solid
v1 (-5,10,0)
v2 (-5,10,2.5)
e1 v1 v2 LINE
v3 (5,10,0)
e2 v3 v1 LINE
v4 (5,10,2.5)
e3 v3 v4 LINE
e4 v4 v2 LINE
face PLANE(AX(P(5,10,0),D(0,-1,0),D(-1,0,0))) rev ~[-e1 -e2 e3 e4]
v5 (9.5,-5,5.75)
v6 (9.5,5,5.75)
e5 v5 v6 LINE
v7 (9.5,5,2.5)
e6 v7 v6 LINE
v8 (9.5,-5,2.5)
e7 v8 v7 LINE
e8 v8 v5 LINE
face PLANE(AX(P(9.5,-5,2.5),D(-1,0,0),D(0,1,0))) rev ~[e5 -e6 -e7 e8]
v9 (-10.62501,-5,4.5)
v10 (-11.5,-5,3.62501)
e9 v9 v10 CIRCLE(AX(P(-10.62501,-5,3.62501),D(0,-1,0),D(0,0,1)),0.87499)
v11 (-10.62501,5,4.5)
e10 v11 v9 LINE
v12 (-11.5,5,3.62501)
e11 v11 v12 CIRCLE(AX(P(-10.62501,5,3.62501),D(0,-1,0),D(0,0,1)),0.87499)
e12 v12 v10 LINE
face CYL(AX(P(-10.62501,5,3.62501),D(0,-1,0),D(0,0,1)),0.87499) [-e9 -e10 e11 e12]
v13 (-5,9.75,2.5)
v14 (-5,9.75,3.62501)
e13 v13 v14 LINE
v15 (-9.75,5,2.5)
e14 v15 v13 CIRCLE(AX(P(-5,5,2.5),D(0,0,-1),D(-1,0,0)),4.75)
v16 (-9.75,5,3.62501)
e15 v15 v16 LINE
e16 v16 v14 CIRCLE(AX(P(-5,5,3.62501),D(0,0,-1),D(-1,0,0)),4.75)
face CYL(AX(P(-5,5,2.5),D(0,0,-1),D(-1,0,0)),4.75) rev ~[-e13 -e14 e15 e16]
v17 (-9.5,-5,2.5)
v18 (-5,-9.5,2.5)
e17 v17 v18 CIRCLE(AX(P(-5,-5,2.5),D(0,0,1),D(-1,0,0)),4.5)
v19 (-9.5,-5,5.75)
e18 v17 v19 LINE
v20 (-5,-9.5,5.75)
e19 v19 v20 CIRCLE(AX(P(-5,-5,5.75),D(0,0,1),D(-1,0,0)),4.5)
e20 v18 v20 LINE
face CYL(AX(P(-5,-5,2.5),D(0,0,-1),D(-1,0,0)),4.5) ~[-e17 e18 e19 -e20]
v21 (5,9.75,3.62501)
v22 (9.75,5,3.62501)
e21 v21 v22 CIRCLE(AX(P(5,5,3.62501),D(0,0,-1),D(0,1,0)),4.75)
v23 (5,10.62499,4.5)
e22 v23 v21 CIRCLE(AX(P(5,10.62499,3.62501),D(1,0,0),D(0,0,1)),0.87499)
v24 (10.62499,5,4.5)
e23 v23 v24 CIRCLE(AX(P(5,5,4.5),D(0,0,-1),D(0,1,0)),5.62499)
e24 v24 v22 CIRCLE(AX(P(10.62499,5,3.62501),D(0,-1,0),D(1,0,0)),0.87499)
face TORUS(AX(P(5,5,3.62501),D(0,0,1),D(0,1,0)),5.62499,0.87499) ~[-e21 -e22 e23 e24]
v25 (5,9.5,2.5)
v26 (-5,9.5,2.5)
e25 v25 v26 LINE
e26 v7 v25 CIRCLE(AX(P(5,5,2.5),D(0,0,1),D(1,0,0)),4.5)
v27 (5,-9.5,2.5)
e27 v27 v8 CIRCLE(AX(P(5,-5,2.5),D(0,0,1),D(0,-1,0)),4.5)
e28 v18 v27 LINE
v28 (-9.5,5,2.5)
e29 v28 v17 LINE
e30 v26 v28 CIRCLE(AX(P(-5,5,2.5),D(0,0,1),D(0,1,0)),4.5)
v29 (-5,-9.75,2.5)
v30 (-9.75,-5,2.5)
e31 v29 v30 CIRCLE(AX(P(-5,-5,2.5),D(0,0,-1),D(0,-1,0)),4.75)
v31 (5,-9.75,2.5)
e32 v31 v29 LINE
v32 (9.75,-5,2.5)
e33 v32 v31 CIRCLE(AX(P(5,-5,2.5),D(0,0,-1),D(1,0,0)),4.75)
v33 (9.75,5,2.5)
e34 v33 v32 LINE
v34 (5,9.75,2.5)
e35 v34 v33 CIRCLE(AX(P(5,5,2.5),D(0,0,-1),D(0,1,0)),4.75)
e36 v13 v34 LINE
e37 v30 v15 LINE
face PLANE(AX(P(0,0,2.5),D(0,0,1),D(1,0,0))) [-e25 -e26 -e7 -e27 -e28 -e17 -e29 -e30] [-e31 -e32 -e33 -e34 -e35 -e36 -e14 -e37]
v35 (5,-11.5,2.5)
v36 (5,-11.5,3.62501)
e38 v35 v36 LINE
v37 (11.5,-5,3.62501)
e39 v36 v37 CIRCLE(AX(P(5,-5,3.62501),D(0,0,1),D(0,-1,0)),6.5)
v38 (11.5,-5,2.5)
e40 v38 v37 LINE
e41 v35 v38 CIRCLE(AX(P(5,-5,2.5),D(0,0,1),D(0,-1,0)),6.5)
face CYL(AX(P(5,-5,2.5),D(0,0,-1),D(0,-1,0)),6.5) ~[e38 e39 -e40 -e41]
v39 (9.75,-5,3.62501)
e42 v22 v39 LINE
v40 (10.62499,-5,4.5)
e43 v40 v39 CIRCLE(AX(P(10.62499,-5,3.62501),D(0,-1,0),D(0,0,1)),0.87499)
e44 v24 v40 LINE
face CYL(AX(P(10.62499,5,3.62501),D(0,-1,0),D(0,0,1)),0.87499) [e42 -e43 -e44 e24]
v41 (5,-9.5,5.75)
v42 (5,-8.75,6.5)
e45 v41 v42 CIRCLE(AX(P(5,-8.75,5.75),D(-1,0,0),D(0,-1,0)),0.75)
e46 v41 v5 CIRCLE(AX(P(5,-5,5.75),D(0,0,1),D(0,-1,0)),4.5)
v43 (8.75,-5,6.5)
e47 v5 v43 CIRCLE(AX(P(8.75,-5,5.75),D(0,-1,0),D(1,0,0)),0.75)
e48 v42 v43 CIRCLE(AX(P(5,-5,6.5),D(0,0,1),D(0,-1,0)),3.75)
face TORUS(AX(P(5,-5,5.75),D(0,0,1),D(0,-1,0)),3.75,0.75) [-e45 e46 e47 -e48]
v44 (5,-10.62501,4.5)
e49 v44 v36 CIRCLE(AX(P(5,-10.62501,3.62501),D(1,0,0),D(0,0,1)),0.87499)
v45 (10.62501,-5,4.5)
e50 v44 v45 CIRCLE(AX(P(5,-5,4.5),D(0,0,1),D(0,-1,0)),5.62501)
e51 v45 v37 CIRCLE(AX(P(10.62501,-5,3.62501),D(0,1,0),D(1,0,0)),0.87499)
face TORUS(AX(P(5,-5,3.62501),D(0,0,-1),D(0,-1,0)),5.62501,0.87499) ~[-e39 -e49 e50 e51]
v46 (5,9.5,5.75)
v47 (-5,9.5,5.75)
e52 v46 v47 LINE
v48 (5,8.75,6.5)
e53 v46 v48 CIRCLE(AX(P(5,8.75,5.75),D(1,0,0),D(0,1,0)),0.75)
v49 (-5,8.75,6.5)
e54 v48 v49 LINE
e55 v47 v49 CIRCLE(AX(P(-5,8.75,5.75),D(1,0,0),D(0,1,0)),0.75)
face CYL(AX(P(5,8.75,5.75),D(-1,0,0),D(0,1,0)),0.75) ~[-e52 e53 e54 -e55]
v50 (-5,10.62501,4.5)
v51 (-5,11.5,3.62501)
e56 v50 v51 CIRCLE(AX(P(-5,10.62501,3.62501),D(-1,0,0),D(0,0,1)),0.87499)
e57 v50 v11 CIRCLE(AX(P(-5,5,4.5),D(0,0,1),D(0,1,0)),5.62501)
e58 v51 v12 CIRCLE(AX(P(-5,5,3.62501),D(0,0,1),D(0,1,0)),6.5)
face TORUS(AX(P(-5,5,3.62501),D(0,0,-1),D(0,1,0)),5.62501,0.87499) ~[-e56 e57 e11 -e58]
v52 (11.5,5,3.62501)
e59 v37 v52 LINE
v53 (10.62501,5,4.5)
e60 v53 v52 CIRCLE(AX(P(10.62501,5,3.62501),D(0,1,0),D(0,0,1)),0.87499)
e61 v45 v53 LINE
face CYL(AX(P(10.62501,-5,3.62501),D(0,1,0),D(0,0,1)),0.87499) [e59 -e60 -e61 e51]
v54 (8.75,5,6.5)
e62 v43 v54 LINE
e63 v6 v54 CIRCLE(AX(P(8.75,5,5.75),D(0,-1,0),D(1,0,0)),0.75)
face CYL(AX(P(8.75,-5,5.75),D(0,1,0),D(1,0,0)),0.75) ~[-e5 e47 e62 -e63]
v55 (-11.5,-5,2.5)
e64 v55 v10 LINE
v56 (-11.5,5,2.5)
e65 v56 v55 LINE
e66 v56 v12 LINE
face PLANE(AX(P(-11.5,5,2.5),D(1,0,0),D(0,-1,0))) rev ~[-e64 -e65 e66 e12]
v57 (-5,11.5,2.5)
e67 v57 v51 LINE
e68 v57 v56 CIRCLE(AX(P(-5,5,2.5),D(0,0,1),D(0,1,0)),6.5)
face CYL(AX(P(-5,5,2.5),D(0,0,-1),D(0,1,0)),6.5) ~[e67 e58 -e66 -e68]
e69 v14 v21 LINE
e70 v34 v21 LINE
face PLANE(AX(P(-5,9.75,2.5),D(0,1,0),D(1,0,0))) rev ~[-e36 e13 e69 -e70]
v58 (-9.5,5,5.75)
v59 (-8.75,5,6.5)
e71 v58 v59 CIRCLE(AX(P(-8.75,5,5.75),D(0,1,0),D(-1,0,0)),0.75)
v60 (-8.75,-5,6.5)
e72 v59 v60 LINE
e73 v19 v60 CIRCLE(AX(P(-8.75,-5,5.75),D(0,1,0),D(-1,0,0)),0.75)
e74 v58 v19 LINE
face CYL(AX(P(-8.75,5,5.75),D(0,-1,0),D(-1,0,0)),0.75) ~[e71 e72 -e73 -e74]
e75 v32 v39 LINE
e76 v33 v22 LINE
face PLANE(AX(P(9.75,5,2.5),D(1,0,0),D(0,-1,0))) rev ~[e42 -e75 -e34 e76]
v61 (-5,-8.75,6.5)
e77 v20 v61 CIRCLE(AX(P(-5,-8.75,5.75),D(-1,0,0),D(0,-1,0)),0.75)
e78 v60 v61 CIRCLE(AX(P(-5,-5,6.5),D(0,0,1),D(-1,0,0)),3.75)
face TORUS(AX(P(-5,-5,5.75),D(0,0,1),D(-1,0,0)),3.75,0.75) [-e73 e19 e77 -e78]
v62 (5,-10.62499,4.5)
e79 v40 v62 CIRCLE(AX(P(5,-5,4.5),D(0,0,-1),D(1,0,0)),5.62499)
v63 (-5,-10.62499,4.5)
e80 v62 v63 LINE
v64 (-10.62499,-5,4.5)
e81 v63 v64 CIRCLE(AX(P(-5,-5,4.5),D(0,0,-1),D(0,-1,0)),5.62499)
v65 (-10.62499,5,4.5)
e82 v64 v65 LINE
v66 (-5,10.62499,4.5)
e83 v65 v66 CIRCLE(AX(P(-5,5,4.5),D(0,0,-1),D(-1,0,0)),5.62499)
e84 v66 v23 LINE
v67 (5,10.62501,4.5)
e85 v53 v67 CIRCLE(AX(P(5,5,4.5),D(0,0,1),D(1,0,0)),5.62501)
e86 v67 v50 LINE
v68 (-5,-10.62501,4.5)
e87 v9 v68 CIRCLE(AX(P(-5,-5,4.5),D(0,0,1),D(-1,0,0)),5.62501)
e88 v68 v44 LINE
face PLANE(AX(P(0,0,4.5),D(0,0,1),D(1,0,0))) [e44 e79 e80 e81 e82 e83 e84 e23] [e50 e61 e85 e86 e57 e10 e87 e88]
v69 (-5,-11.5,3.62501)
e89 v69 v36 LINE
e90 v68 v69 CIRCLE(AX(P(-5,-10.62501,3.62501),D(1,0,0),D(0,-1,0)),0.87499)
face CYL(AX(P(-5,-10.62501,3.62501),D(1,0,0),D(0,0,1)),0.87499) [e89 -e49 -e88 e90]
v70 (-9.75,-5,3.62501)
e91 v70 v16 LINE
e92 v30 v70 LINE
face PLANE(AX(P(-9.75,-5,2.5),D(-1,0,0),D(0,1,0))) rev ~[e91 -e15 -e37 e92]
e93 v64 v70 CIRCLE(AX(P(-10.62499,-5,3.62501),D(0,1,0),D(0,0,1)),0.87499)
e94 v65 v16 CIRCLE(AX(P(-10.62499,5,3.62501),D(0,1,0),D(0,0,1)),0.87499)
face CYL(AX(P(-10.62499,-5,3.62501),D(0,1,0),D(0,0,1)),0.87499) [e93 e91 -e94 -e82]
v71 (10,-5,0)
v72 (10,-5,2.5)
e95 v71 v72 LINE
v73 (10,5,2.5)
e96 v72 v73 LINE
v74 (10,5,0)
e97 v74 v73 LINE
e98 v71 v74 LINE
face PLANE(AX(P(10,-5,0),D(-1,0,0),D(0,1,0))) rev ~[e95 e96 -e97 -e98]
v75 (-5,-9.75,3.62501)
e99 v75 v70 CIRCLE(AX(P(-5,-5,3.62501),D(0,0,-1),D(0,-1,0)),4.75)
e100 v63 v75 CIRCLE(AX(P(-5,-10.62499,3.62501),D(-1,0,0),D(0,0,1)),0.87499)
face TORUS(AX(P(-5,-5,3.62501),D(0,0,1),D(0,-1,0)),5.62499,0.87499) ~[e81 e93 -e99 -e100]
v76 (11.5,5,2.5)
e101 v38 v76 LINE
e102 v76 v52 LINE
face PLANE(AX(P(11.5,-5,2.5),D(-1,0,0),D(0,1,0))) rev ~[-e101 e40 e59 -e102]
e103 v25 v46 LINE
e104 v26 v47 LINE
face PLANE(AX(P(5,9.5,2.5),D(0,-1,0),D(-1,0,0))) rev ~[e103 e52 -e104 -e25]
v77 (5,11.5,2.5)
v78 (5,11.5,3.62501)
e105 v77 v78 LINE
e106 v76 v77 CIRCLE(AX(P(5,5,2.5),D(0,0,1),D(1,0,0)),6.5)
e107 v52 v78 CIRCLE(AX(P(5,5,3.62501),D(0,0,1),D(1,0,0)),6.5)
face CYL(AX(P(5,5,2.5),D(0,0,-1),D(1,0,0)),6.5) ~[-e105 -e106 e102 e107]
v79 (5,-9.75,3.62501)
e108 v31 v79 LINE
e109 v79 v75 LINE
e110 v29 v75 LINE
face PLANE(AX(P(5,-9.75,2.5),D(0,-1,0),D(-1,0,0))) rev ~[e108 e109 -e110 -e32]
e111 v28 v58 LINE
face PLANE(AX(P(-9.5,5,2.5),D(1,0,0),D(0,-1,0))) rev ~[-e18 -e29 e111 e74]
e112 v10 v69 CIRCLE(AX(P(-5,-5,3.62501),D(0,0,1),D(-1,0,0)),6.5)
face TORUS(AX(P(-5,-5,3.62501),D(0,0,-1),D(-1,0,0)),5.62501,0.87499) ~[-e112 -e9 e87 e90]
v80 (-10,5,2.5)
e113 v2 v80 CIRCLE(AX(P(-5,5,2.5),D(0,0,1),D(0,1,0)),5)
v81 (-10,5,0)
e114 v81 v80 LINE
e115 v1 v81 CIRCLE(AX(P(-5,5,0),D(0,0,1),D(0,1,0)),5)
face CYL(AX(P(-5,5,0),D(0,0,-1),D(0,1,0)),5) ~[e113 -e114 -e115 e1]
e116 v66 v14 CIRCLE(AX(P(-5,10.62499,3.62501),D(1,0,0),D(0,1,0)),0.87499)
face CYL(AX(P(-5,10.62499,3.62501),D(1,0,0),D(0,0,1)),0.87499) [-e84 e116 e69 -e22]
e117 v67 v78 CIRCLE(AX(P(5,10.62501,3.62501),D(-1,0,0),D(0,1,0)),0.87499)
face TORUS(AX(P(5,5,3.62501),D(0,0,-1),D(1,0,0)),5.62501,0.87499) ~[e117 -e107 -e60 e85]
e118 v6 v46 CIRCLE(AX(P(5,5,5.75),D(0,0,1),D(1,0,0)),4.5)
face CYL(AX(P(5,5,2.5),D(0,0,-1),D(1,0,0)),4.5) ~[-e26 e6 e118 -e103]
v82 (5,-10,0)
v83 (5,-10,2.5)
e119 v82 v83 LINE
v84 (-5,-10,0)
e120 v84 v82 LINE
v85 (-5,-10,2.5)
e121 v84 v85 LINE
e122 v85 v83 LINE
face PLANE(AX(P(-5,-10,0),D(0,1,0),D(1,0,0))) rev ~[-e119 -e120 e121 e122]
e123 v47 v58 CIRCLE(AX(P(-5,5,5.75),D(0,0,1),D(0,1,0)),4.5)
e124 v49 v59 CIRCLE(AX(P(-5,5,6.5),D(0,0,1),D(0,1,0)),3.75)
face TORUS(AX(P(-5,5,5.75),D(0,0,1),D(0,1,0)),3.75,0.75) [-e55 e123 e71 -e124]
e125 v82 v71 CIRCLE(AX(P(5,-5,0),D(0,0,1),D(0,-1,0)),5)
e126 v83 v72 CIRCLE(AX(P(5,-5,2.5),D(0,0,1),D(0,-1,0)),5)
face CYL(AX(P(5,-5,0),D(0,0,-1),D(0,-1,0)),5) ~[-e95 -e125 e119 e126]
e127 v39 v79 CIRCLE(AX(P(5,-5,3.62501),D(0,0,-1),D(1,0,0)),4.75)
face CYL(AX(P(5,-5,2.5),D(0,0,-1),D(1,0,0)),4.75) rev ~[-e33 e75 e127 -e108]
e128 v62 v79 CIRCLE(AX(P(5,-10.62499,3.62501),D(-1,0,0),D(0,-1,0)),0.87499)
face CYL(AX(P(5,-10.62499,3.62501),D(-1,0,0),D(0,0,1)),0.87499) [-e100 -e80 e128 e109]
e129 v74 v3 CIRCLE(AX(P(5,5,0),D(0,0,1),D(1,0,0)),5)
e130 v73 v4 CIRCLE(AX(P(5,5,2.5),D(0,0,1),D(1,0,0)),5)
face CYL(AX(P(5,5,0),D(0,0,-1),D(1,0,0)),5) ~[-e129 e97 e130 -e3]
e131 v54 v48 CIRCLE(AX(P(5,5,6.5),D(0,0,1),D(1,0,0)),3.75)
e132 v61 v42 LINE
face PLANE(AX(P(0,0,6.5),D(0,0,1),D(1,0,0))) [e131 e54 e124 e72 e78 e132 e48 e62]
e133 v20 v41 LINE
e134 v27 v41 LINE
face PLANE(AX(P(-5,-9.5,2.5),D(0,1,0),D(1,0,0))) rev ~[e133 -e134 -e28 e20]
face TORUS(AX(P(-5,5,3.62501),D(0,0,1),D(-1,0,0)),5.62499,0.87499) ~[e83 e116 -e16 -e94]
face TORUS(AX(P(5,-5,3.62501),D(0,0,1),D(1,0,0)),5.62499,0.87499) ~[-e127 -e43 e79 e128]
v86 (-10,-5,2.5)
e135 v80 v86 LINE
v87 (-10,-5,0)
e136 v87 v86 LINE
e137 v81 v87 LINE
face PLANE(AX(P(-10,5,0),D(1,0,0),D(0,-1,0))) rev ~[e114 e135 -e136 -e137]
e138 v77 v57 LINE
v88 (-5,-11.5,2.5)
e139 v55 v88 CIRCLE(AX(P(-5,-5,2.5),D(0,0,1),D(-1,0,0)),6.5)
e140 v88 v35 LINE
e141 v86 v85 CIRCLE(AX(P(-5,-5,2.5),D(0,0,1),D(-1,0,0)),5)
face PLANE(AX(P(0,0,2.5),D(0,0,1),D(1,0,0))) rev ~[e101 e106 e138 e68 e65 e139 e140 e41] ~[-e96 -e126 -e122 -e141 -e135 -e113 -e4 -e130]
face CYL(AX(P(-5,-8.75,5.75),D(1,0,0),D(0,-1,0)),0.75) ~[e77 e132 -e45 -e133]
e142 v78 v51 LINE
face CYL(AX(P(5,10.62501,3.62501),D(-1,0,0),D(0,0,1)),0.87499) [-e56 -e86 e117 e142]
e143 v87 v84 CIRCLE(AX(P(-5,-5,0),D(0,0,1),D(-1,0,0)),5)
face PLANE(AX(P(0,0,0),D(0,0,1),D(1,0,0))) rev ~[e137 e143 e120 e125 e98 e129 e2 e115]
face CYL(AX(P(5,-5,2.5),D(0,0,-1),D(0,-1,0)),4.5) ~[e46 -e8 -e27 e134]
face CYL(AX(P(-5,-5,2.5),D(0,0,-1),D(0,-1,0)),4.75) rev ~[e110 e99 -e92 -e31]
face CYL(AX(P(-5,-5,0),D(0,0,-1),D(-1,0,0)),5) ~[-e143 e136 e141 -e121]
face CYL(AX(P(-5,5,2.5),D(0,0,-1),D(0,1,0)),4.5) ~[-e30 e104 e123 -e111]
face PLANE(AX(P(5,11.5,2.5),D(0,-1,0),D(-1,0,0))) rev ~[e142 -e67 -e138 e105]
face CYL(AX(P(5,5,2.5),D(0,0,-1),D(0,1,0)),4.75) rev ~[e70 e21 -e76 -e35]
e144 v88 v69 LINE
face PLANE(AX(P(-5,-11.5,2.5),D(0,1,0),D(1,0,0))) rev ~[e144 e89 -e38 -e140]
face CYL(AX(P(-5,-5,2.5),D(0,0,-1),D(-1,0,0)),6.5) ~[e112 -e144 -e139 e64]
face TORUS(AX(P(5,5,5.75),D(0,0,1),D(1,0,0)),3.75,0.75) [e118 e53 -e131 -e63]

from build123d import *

# Parameters (mm, degrees)
F1_DEPTH = 2.5
F3_DEPTH = 2
F4_R     = 0.87499
F6_DEPTH = 4
F7_R     = 0.75


# Not quite as in the source:
# - a fillet or chamfer is up to 0.001 mm smaller than in the source, because OpenCascade refuses the exact size


with BuildPart() as f1:
    # F0 (on Top) → F1 (new body)
    with BuildSketch(Plane.XY):
        with BuildLine():
            Line((-5, -10), (5, -10))
            ThreePointArc((5, -10), (8.5355339059, -8.5355339059), (10, -5))
            Line((10, -5), (10, 5))
            ThreePointArc((10, 5), (8.5355339059, 8.5355339059), (5, 10))
            Line((5, 10), (-5, 10))
            ThreePointArc((-5, 10), (-8.5355339059, 8.5355339059), (-10, 5))
            Line((-10, 5), (-10, -5))
            ThreePointArc((-10, -5), (-8.5355339059, -8.5355339059), (-5, -10))
        make_face()
    extrude(amount=F1_DEPTH)

    # F2 (on face) → F3 (join)
    with BuildSketch(Plane.XY.offset(2.5)):
        with BuildLine():
            Line((-5, -11.5), (5, -11.5))
            ThreePointArc((5, -11.5), (9.5961940777, -9.5961940777), (11.5, -5))
            Line((11.5, -5), (11.5, 5))
            ThreePointArc((11.5, 5), (9.5961940777, 9.5961940777), (5, 11.5))
            Line((5, 11.5), (-5, 11.5))
            ThreePointArc((-5, 11.5), (-9.5961940777, 9.5961940777), (-11.5, 5))
            Line((-11.5, 5), (-11.5, -5))
            ThreePointArc((-11.5, -5), (-9.5961940777, -9.5961940777), (-5, -11.5))
        make_face()
        with BuildLine():
            ThreePointArc((9.75, -5), (8.3587572106, -8.3587572106), (5, -9.75))
            Line((5, -9.75), (-5, -9.75))
            ThreePointArc((-5, -9.75), (-8.3587572106, -8.3587572106), (-9.75, -5))
            Line((-9.75, -5), (-9.75, 5))
            ThreePointArc((-9.75, 5), (-8.3587572106, 8.3587572106), (-5, 9.75))
            Line((-5, 9.75), (5, 9.75))
            ThreePointArc((5, 9.75), (8.3587572106, 8.3587572106), (9.75, 5))
            Line((9.75, 5), (9.75, -5))
        make_face(mode=Mode.SUBTRACT)
    extrude(amount=F3_DEPTH)

    # F4 (radius 0.875 in the source; OpenCascade refuses exactly that, so slightly less here)
    f4_edges = [f1.edges().sort_by_distance(p)[0] for p in [
        (-9.75, 0, 4.5),
        (-11.5, 0, 4.5),
    ]]
    fillet(f4_edges, radius=F4_R)

    # F5 (on face) → F6 (join)
    with BuildSketch(Plane.XY.offset(2.5)):
        with BuildLine():
            ThreePointArc((9.5, 5), (8.1819805153, 8.1819805153), (5, 9.5))
            Line((5, 9.5), (-5, 9.5))
            ThreePointArc((-5, 9.5), (-8.1819805153, 8.1819805153), (-9.5, 5))
            Line((-9.5, 5), (-9.5, -5))
            ThreePointArc((-9.5, -5), (-8.1819805153, -8.1819805153), (-5, -9.5))
            Line((-5, -9.5), (5, -9.5))
            ThreePointArc((5, -9.5), (8.1819805153, -8.1819805153), (9.5, -5))
            Line((9.5, -5), (9.5, 5))
        make_face()
    extrude(amount=F6_DEPTH)

    # F7
    f7_edges = [f1.edges().sort_by_distance(p)[0] for p in [
        (0, -9.5, 6.5),
    ]]
    fillet(f7_edges, radius=F7_R)


solid = f1.part
